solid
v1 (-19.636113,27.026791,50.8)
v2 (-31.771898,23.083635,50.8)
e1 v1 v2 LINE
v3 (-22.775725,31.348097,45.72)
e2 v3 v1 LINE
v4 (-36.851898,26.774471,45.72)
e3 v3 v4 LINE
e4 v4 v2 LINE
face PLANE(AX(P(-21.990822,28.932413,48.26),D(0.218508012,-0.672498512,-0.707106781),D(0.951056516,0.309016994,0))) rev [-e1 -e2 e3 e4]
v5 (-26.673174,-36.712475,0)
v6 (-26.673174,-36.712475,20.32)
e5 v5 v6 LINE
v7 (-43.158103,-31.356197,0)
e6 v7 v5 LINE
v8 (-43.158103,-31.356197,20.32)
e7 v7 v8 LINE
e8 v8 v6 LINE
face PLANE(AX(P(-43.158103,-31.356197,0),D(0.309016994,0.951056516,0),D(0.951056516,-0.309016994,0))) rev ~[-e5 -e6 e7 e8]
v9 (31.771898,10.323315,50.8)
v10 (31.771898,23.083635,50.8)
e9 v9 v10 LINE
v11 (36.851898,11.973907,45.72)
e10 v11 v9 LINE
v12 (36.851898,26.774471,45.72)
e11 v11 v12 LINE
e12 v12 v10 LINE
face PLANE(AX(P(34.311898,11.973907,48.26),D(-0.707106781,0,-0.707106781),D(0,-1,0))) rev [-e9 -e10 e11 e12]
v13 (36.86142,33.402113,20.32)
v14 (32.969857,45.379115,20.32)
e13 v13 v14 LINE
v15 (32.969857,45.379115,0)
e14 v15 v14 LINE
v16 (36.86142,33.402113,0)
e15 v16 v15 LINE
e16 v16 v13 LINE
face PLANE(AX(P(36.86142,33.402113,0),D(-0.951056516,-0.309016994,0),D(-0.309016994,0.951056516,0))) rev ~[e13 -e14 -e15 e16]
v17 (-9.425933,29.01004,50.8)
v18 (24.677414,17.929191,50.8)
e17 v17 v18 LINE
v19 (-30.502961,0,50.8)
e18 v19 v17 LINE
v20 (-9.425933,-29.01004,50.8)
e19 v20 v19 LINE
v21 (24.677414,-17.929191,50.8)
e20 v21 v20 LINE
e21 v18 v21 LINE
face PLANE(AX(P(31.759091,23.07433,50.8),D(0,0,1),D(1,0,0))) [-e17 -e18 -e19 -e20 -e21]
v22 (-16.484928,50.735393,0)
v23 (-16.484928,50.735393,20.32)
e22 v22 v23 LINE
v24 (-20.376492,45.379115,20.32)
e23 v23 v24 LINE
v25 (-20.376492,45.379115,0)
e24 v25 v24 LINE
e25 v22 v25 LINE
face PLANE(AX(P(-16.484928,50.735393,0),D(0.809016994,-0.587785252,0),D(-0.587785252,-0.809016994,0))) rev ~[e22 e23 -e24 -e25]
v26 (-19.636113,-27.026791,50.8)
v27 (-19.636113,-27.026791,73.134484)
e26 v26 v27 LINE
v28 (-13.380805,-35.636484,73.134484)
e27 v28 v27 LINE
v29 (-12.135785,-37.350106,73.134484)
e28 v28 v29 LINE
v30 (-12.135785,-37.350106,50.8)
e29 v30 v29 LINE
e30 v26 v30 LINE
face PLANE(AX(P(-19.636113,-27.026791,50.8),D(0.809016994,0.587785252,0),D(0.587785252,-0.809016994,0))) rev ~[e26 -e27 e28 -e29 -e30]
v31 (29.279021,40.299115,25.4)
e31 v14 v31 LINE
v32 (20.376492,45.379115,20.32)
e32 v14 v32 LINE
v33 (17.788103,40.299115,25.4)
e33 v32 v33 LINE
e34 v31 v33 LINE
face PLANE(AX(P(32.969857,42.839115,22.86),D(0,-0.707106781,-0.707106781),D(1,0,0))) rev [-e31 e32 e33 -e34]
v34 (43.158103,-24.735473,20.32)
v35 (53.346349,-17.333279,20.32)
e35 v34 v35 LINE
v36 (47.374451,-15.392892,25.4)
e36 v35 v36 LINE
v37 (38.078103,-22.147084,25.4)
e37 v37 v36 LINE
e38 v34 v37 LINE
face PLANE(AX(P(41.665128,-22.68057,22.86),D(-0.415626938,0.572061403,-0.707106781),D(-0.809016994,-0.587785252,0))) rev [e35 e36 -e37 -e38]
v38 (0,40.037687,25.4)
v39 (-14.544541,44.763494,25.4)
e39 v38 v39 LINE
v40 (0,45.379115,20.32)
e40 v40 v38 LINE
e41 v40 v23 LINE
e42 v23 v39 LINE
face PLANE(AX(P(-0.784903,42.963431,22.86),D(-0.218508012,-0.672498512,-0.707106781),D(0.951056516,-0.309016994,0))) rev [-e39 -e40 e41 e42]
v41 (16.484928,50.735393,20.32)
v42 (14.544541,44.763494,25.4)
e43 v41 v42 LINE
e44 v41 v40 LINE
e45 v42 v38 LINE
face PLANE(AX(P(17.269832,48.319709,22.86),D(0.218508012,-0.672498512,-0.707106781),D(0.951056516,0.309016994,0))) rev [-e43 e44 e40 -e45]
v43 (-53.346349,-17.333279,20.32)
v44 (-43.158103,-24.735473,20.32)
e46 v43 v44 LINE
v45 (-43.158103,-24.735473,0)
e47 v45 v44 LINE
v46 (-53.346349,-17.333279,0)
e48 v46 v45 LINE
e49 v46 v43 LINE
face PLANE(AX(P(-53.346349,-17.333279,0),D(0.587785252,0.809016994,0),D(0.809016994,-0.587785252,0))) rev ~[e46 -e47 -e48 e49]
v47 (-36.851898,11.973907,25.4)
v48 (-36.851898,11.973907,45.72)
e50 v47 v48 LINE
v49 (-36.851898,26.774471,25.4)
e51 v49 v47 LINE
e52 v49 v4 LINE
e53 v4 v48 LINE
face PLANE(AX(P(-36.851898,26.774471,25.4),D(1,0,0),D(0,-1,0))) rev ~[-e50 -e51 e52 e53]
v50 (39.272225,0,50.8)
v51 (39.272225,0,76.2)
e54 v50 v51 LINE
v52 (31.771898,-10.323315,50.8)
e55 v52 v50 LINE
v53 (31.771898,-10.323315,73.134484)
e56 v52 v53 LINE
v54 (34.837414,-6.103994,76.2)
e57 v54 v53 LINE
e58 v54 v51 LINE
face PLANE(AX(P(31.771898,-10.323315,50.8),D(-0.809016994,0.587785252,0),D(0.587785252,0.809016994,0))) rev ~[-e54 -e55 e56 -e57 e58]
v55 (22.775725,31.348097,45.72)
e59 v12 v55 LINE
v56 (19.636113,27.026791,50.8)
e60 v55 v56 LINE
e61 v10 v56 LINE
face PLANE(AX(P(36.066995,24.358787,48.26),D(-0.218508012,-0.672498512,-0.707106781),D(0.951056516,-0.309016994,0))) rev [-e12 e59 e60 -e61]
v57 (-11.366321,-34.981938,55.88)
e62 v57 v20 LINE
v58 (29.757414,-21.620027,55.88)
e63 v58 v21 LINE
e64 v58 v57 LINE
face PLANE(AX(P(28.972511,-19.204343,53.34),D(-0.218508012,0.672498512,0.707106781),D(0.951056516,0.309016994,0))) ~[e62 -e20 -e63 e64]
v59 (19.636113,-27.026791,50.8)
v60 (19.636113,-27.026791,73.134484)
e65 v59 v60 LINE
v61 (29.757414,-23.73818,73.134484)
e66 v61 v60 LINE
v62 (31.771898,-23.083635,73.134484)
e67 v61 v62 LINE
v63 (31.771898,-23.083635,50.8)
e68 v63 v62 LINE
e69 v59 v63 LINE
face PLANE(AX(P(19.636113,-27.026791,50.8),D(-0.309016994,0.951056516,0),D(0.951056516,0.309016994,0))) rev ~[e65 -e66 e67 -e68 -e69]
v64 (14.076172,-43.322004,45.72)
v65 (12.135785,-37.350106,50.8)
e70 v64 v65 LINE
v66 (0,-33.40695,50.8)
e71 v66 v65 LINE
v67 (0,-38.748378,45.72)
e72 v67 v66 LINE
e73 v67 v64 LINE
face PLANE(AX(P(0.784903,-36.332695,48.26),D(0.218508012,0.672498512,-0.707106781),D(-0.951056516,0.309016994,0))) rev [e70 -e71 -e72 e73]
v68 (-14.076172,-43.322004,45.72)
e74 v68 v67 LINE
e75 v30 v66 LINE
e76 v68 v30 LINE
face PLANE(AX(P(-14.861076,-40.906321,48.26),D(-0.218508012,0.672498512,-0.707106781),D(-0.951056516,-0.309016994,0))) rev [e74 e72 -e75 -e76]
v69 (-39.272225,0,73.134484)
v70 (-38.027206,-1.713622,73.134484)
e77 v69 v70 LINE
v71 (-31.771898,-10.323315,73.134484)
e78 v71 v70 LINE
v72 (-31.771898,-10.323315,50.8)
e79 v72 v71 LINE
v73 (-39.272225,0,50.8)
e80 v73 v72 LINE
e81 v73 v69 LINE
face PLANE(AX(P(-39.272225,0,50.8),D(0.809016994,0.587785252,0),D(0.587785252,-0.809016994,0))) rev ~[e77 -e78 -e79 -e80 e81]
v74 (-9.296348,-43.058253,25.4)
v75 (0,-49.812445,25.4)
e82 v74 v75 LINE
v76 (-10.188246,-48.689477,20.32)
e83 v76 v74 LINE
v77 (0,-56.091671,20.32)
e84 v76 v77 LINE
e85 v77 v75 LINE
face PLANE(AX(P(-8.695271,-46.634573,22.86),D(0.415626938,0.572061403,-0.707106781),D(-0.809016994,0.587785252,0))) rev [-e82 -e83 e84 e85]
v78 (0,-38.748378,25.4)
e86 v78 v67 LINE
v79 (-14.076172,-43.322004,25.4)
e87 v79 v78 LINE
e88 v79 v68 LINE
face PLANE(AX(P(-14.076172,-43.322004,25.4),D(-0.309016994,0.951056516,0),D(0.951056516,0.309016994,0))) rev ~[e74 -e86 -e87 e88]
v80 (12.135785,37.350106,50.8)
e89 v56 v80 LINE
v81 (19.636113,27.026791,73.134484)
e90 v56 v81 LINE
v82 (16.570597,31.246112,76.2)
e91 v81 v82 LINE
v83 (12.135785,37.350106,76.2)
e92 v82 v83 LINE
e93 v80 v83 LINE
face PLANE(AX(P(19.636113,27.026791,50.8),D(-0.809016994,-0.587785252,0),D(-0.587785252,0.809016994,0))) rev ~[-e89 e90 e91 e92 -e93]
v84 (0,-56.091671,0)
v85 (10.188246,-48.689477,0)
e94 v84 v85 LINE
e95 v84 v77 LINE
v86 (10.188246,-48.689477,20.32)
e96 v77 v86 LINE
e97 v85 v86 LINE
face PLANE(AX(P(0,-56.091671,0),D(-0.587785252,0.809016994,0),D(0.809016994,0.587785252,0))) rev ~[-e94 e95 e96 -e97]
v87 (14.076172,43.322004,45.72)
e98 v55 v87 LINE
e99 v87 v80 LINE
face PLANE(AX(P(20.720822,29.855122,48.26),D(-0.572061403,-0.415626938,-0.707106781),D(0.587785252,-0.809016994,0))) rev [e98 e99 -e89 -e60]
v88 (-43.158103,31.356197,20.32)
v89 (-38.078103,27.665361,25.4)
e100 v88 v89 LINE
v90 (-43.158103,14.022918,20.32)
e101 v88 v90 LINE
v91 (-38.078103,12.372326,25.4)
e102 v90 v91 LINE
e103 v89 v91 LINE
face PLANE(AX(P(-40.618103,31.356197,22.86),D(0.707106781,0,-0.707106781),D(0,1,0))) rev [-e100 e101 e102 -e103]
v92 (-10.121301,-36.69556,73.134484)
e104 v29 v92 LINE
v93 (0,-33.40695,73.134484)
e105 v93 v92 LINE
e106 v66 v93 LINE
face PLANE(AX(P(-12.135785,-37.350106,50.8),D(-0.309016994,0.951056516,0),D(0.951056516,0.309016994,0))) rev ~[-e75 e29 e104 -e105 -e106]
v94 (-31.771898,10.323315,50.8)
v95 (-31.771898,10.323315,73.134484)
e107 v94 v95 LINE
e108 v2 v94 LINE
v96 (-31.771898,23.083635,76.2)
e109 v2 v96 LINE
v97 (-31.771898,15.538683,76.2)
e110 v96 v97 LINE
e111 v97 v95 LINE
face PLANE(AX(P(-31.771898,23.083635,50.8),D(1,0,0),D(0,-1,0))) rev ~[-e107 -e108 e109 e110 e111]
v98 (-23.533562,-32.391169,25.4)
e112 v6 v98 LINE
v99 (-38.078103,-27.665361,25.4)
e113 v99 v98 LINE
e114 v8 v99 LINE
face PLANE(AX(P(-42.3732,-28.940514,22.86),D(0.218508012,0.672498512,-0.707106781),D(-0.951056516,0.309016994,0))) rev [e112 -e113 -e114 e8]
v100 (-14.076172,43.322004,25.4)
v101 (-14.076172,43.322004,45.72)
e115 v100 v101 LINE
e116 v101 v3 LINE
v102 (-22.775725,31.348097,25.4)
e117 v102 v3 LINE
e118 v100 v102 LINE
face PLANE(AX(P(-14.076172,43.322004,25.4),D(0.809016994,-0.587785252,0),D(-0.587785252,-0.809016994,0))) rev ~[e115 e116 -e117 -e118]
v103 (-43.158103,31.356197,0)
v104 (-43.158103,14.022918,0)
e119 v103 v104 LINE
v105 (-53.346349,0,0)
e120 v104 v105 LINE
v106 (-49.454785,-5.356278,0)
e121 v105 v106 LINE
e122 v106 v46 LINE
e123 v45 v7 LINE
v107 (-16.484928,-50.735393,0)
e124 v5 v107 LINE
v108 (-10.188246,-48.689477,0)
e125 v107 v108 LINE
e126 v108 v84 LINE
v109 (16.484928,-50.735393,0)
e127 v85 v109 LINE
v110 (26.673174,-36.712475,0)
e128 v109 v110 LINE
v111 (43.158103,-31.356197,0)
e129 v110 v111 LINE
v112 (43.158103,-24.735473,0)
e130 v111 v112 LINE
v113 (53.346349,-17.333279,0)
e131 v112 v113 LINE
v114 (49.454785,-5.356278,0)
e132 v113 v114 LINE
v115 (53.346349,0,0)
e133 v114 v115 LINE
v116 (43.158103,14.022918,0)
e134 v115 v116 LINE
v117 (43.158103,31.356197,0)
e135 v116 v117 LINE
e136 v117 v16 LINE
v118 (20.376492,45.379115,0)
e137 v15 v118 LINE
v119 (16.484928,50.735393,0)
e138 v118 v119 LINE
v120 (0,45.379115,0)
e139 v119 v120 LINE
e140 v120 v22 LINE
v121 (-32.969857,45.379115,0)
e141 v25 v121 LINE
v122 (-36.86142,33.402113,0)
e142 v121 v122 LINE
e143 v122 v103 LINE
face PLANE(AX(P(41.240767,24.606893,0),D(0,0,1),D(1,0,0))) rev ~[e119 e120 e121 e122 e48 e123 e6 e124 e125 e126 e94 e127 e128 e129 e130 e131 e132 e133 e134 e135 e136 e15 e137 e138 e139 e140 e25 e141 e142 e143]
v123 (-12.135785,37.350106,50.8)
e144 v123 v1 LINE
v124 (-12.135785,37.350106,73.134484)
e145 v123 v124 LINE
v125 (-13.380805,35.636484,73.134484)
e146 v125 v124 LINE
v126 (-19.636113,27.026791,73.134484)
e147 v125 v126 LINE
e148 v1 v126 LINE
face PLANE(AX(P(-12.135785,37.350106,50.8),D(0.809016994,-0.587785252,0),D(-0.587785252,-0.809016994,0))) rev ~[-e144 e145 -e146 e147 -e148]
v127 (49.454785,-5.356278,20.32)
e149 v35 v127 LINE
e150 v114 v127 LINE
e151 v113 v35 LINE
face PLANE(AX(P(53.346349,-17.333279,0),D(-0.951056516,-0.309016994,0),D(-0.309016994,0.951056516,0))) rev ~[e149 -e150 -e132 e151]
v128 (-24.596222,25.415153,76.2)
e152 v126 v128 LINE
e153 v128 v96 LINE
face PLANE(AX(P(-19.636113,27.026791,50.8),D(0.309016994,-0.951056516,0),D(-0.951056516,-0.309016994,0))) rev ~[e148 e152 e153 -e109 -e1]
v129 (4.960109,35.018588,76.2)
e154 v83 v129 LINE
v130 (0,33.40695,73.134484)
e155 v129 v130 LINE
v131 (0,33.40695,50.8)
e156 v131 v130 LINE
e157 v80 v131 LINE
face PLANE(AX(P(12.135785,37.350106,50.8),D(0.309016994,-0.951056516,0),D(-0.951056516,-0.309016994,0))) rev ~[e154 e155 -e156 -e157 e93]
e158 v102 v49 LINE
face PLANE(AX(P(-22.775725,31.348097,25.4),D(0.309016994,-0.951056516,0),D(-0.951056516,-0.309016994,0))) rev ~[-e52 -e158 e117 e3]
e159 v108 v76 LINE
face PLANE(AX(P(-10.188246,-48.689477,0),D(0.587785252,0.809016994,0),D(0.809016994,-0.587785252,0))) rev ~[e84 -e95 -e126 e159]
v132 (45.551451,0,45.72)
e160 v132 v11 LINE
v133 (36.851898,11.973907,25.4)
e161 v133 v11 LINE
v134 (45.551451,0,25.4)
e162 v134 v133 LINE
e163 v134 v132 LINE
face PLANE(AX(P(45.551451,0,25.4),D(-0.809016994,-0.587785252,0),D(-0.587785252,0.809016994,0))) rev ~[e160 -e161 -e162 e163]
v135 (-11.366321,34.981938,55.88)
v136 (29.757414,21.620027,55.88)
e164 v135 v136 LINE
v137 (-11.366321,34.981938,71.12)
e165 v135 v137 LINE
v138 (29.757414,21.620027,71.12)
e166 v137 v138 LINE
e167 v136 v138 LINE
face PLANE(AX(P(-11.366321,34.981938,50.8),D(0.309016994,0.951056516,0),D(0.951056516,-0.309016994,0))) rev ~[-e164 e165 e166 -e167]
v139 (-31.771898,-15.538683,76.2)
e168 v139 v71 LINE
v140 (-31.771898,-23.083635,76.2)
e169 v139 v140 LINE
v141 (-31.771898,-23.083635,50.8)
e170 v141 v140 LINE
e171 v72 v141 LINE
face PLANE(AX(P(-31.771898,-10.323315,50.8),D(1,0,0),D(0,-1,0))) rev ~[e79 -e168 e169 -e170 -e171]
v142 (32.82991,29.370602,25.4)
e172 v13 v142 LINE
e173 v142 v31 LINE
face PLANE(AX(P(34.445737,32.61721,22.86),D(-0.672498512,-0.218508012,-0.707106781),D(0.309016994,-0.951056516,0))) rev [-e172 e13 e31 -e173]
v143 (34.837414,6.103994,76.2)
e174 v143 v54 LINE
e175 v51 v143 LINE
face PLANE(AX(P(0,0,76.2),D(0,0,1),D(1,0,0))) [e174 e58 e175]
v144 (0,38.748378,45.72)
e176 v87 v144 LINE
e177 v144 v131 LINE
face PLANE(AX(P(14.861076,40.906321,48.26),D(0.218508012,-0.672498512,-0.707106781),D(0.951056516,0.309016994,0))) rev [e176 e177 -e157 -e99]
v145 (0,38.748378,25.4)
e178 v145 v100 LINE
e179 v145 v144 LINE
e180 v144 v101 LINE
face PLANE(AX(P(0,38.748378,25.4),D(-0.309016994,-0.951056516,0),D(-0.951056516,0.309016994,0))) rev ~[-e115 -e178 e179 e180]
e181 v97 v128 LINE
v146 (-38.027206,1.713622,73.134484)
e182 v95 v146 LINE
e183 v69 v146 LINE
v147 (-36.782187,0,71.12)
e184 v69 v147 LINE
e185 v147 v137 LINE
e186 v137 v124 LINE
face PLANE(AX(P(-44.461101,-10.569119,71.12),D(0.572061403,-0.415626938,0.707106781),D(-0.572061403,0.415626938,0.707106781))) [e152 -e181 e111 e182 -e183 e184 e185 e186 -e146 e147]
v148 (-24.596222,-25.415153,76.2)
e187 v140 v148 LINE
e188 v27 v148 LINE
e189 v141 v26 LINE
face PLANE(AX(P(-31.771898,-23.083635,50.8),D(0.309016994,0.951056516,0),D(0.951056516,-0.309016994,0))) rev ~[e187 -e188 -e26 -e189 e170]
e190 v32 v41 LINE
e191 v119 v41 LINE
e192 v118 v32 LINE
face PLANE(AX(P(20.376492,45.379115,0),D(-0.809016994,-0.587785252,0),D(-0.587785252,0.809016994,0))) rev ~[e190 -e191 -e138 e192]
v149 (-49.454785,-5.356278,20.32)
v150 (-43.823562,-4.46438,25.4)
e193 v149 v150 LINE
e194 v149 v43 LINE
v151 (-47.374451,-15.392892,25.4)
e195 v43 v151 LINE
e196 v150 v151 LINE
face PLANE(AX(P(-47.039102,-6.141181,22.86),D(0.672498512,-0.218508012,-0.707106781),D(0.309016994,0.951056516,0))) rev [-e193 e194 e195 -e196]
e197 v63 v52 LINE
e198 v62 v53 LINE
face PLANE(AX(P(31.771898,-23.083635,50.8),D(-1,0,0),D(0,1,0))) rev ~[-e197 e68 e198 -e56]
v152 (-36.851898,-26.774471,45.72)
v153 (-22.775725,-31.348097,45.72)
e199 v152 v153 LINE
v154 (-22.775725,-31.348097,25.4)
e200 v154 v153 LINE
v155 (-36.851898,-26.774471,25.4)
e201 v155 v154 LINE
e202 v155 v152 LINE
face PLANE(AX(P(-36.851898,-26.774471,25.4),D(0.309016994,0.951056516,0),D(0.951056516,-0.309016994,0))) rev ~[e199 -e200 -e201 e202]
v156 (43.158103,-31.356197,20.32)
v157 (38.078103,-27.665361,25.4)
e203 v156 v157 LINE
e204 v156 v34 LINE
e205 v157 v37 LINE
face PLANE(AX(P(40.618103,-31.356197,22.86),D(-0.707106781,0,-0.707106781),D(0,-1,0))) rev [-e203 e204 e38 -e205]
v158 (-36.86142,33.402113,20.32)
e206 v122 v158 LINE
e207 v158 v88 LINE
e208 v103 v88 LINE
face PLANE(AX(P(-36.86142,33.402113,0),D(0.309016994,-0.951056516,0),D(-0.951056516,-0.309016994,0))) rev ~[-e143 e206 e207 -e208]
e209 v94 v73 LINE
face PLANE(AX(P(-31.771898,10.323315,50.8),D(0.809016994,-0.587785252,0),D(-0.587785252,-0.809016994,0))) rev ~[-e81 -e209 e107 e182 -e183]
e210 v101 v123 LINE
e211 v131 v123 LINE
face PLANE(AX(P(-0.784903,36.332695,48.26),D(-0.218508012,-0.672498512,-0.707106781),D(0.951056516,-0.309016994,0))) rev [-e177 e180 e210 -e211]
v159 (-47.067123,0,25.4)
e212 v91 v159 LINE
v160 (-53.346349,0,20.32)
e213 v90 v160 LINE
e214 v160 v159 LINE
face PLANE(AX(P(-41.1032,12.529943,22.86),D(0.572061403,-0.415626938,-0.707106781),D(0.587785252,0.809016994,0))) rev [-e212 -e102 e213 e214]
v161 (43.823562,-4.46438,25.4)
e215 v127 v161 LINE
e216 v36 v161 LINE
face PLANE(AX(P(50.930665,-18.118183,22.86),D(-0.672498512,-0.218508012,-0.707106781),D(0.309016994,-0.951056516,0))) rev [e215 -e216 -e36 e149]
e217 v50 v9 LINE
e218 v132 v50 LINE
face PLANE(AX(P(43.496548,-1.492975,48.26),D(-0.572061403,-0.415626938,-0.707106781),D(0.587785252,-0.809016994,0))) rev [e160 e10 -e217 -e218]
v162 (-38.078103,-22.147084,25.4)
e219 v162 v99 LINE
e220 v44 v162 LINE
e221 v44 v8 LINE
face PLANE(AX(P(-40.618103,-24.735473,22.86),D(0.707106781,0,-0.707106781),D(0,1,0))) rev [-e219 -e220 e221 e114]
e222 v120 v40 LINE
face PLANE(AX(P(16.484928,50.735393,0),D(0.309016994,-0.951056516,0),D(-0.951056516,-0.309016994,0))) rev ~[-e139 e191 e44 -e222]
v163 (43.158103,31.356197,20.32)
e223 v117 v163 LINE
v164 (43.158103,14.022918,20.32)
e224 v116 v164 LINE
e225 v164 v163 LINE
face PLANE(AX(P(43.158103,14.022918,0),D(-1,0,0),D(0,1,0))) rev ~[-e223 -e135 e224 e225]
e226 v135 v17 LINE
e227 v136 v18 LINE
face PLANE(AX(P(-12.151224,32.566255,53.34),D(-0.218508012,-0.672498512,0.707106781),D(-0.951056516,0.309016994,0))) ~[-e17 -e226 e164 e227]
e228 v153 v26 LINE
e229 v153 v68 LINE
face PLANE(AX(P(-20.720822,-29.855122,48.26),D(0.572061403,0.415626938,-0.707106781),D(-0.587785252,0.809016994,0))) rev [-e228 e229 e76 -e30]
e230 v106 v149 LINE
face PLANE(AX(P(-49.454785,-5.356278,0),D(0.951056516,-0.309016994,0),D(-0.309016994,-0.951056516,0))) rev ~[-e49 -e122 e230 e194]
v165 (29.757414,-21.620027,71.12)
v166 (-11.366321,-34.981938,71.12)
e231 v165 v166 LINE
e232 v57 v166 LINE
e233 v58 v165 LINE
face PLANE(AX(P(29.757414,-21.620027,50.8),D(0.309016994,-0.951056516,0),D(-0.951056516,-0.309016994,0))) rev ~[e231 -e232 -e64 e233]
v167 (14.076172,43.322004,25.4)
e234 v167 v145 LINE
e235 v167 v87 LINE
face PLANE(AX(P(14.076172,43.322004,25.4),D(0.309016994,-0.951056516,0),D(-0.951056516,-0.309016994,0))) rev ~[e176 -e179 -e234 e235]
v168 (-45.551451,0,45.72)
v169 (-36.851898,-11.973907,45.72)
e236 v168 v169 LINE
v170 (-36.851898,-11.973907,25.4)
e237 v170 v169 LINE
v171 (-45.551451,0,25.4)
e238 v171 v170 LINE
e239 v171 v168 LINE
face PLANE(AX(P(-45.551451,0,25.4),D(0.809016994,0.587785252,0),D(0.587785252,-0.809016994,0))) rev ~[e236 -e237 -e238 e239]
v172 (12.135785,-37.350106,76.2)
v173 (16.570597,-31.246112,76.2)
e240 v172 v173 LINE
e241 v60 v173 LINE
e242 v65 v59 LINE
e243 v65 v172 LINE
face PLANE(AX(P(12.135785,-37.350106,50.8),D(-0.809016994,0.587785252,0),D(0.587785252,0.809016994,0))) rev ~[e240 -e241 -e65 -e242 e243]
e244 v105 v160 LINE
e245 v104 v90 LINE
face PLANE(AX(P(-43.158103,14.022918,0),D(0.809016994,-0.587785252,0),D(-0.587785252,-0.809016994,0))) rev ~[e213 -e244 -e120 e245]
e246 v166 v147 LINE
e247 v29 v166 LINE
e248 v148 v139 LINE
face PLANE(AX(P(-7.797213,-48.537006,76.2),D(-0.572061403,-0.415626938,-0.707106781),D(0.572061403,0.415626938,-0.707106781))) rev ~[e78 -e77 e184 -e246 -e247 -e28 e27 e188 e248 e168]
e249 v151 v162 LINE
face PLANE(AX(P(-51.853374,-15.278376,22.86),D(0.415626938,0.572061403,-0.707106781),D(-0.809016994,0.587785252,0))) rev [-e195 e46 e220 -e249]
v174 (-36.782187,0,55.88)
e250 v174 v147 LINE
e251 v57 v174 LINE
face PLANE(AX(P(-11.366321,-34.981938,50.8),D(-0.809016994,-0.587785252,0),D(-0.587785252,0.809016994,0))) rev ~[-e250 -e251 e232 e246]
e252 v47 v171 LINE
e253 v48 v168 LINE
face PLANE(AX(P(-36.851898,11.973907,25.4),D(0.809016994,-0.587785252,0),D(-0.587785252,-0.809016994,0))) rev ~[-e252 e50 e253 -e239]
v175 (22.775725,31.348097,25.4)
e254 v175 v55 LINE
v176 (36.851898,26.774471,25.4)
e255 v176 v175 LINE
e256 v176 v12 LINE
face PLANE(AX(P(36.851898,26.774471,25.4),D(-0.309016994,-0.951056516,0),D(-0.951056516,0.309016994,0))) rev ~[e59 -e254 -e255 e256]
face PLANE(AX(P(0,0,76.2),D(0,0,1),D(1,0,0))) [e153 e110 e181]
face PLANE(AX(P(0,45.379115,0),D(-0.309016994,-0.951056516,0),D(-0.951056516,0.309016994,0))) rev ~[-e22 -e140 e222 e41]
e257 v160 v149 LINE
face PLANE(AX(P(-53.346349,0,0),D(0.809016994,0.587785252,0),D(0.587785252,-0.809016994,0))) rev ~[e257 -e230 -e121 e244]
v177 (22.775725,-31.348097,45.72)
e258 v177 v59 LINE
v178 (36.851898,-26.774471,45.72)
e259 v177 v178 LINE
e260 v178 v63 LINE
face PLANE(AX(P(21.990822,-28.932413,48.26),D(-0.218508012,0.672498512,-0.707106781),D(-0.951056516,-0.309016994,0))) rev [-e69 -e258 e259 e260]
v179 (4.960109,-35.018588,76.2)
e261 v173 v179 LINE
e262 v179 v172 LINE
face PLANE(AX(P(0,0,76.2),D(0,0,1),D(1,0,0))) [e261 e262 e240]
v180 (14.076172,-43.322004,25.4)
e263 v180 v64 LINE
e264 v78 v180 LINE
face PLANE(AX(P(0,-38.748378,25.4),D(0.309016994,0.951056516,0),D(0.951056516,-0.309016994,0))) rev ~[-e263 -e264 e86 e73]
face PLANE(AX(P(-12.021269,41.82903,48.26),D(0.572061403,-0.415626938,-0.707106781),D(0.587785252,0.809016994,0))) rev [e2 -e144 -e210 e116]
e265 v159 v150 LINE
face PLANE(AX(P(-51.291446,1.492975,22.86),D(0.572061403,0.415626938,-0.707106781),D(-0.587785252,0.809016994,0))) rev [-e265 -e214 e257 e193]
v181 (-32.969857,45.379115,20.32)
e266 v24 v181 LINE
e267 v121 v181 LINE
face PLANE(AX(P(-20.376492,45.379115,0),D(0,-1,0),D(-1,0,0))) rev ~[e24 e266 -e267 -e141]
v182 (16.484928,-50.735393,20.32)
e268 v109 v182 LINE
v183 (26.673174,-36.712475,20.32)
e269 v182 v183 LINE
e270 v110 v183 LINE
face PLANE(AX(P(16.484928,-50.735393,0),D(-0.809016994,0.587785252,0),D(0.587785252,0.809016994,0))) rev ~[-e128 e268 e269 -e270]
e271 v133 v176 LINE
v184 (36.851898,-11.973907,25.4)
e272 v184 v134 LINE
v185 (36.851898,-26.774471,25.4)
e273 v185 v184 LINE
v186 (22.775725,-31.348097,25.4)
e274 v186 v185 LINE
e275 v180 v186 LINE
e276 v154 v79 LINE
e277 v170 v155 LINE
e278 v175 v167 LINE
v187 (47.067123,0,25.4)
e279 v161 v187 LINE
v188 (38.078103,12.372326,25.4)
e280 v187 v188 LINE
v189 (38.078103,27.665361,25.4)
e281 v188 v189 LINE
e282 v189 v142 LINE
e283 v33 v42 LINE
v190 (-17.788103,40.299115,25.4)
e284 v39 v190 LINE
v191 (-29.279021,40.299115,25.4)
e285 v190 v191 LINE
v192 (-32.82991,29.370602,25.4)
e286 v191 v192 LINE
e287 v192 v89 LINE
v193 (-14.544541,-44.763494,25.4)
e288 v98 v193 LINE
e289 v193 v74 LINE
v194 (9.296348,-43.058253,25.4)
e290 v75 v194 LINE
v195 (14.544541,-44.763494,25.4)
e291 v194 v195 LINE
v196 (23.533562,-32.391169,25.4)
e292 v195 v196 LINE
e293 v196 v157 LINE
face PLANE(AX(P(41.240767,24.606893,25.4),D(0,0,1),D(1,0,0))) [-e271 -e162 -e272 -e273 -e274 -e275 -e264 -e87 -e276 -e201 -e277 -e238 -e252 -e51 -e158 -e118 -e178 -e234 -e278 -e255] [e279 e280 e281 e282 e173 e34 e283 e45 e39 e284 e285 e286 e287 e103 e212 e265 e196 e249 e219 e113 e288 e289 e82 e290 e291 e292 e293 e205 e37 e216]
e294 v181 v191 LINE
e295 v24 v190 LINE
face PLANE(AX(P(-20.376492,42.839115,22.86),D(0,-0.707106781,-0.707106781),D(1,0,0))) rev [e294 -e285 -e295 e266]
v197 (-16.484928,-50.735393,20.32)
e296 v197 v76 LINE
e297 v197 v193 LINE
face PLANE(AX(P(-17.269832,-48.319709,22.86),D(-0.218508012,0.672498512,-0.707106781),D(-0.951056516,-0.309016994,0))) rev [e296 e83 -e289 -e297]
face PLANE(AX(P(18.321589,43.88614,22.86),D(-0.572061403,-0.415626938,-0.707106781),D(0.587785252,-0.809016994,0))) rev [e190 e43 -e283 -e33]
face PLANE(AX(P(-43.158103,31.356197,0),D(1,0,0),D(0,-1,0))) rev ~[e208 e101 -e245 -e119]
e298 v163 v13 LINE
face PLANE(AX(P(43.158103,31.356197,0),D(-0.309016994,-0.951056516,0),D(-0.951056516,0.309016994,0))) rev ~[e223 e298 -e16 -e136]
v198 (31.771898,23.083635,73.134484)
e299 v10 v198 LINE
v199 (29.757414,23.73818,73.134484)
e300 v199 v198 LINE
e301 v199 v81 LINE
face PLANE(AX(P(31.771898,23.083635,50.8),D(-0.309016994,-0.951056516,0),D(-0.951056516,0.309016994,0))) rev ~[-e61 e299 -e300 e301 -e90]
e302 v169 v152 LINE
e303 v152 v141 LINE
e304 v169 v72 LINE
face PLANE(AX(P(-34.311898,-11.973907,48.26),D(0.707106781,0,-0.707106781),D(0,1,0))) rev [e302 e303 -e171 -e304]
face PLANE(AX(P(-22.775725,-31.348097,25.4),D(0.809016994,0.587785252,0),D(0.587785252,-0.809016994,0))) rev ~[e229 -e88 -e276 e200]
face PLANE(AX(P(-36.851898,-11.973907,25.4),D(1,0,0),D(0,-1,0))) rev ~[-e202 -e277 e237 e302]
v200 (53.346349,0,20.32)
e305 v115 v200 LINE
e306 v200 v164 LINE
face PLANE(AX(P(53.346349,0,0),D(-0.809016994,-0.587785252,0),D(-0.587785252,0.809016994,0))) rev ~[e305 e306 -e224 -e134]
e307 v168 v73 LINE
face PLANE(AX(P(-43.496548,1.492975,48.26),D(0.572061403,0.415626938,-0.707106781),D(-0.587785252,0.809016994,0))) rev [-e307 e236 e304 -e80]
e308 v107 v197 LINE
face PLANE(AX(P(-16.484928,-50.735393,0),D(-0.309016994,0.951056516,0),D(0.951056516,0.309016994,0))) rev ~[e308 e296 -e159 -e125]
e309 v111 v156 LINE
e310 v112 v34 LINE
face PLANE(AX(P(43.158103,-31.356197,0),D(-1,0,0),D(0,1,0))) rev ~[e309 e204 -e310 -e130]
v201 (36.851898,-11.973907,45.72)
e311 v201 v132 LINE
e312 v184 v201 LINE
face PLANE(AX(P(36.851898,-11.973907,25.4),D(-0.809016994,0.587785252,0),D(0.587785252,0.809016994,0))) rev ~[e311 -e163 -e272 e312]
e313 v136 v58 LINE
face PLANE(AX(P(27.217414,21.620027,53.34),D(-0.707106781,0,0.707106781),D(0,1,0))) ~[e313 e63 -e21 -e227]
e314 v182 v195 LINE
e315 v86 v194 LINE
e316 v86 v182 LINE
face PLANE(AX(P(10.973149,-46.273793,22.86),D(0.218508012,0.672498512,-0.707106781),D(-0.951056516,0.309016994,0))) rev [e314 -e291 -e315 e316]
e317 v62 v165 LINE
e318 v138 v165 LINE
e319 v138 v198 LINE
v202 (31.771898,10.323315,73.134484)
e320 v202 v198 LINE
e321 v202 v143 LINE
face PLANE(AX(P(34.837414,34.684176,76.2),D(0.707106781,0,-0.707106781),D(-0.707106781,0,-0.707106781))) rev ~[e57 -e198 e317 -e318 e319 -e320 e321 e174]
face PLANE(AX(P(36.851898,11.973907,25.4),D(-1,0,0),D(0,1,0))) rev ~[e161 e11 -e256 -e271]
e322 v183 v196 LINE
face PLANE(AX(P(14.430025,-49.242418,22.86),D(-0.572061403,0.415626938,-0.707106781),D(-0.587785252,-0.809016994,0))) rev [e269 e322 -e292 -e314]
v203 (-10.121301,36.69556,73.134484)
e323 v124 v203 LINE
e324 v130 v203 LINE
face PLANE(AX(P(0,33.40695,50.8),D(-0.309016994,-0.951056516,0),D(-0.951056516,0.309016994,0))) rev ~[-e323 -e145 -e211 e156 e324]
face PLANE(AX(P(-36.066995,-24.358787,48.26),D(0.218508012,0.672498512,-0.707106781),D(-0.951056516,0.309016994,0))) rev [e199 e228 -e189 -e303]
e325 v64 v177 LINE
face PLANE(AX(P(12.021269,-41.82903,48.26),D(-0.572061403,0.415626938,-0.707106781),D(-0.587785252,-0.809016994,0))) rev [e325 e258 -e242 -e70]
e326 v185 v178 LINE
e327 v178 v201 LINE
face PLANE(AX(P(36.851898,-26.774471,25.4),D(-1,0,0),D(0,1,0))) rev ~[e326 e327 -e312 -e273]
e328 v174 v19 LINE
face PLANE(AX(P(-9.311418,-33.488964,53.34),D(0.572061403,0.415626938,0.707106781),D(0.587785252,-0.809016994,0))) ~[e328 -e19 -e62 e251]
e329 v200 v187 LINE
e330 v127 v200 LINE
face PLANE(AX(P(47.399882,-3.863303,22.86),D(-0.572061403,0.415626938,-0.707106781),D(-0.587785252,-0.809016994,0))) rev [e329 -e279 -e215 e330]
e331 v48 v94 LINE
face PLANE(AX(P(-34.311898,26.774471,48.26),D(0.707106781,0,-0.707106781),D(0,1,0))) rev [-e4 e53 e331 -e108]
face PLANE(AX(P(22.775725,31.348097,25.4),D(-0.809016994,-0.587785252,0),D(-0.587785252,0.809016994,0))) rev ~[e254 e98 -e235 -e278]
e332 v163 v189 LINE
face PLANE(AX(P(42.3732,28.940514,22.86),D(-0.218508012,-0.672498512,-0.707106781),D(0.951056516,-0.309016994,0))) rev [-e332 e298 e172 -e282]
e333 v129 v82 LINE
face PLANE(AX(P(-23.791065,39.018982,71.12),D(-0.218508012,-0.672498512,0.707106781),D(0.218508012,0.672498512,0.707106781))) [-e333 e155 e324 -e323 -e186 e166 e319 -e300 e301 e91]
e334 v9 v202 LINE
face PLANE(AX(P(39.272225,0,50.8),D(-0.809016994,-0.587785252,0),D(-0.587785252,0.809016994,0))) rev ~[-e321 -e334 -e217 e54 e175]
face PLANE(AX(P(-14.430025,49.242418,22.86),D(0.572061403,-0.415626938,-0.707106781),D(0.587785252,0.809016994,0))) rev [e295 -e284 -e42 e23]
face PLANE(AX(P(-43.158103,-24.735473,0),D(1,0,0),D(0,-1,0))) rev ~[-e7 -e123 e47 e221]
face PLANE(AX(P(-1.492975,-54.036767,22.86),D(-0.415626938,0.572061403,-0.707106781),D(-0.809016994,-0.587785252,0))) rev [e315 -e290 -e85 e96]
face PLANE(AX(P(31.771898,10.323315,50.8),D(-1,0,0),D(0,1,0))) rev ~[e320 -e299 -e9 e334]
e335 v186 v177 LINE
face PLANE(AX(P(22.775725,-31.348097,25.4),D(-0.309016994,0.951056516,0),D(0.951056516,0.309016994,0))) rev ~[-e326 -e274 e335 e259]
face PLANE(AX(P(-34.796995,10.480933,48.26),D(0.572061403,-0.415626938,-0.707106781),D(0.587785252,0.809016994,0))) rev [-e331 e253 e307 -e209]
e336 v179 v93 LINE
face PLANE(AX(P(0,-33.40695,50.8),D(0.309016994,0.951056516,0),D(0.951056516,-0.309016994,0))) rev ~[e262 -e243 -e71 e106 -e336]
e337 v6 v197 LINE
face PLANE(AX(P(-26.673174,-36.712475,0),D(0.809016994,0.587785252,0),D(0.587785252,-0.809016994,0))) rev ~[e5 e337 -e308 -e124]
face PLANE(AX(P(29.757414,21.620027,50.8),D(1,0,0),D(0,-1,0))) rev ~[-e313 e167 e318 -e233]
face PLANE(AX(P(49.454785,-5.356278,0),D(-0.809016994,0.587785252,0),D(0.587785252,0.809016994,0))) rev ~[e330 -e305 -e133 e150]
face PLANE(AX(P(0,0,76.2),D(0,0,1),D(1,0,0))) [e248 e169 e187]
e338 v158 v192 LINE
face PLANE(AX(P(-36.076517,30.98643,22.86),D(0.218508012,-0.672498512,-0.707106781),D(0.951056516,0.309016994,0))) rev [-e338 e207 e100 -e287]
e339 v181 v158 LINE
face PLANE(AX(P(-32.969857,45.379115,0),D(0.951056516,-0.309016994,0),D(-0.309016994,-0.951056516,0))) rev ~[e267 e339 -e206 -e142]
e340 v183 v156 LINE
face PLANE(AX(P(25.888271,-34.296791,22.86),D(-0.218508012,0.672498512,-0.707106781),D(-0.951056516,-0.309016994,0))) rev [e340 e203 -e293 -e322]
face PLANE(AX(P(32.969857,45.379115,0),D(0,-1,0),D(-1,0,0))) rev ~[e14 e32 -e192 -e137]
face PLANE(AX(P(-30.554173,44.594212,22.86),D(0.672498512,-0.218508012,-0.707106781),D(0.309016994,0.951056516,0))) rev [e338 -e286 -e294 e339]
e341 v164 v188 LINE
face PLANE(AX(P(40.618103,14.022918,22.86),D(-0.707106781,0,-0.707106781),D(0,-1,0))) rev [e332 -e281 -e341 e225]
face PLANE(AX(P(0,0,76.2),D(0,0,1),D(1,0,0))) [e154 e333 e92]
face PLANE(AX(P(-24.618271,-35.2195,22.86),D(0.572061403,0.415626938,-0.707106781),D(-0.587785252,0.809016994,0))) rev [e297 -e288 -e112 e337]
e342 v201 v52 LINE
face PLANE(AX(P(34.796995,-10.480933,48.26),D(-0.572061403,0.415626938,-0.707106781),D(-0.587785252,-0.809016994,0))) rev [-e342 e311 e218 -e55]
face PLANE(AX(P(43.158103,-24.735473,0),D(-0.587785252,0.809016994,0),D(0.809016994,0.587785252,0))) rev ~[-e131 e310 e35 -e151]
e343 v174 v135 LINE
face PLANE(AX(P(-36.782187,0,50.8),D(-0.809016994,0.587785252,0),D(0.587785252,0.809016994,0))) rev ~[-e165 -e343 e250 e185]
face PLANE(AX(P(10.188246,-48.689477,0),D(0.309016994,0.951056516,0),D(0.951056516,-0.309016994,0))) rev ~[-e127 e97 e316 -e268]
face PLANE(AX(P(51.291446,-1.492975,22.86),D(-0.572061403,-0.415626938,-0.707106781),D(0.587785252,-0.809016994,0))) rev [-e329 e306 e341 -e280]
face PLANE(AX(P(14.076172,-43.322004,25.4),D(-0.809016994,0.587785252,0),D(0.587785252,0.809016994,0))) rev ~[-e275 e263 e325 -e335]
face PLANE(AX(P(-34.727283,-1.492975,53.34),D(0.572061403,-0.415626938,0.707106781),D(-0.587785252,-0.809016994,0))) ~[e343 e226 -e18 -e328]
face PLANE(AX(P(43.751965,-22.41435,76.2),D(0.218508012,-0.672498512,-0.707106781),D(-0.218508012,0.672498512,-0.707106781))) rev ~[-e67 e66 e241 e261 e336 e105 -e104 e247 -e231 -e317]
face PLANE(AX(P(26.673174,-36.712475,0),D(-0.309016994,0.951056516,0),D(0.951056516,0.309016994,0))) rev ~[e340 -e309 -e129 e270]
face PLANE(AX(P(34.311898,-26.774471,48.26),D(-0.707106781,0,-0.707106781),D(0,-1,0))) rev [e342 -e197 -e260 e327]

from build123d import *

# Parameters (mm, degrees)
F1_DEPTH      = 25.4
F2_SIZE       = 5.08
F4_DEPTH      = 25.4
F5_SIZE       = 5.08
F7_DEPTH      = 25.4
F8_SIZE       = 5.08
F9_T4_DEPTH   = 69.3683527658
F9_T10_DEPTH  = 69.3683527658
F9_T16_DEPTH  = 69.3683527658
F9_T22_DEPTH  = 69.3683527658
F9_T28_DEPTH  = 69.3683527658
F9_T35_DEPTH  = 69.3683527658
F9_T41_DEPTH  = 69.3683527658
F9_T50_DEPTH  = 69.3683527658
F9_T56_DEPTH  = 69.3683527658
F9_T65_DEPTH  = 69.3683527658
F9_T71_DEPTH  = 69.3683527658
F9_T80_DEPTH  = 69.3683527658
F9_T86_DEPTH  = 69.3683527658
F9_T95_DEPTH  = 69.3683527658
F9_T101_DEPTH = 69.3683527658


# Not quite as in the source:
# - a fillet or chamfer that OpenCascade refuses, or shapes differently, is made with other operations: its cross-section is extruded or revolved along the edge and cut away or added


with BuildPart() as f1:
    # F0 (on Top) → F1 (new body)
    with BuildSketch(Plane.XY):
        Polygon((43.1581027806, 14.0229176455), (43.1581027806, 31.3561970981), (36.8614204445, 33.40211321), align=None)
        Polygon((49.4547851167, -5.3562779191), (43.1581027806, 14.0229176455), (43.1581027806, -14.0229176455), align=None)
        Polygon((43.1581027806, -14.0229176455), (43.1581027806, 14.0229176455), (26.6731744084, 36.7124750172), (0, 45.3791147436), (-26.6731744084, 36.7124750172), (-43.1581027806, 14.0229176455), (-43.1581027806, -14.0229176455), (-26.6731744084, -36.7124750172), (0, -45.3791147436), (26.6731744084, -36.7124750172), align=None)
        Polygon((26.6731744084, 36.7124750172), (43.1581027806, 14.0229176455), (36.8614204445, 33.40211321), align=None)
        Polygon((53.3463488167, 0), (43.1581027806, 14.0229176455), (49.4547851167, -5.3562779191), align=None)
        Polygon((26.6731744084, 36.7124750172), (36.8614204445, 33.40211321), (32.9698567444, 45.3791147436), (20.3764920723, 45.3791147436), align=None)
        Polygon((49.4547851167, -5.3562779191), (43.1581027806, -14.0229176455), (43.1581027806, -24.7354734837), (53.3463488167, -17.3332794527), align=None)
        Polygon((43.1581027806, -24.7354734837), (43.1581027806, -14.0229176455), (26.6731744084, -36.7124750172), align=None)
        Polygon((0, 45.3791147436), (26.6731744084, 36.7124750172), (20.3764920723, 45.3791147436), align=None)
        Polygon((43.1581027806, -31.3561970981), (43.1581027806, -24.7354734837), (26.6731744084, -36.7124750172), align=None)
        Polygon((10.1882460361, -48.6894765508), (26.6731744084, -36.7124750172), (0, -45.3791147436), align=None)
        Polygon((16.4849283722, -50.7353926627), (26.6731744084, -36.7124750172), (10.1882460361, -48.6894765508), align=None)
        Polygon((-20.3764920723, 45.3791147436), (0, 45.3791147436), (-16.4849283722, 50.7353926627), align=None)
        Polygon((-26.6731744084, 36.7124750172), (0, 45.3791147436), (-20.3764920723, 45.3791147436), align=None)
        Polygon((16.4849283722, 50.7353926627), (0, 45.3791147436), (20.3764920723, 45.3791147436), align=None)
        Polygon((10.1882460361, -48.6894765508), (0, -45.3791147436), (-10.1882460361, -48.6894765508), (0, -56.0916705818), align=None)
        Polygon((-10.1882460361, -48.6894765508), (0, -45.3791147436), (-26.6731744084, -36.7124750172), align=None)
        Polygon((-36.8614204445, 33.40211321), (-26.6731744084, 36.7124750172), (-20.3764920723, 45.3791147436), (-32.9698567444, 45.3791147436), align=None)
        Polygon((-43.1581027806, 14.0229176455), (-26.6731744084, 36.7124750172), (-36.8614204445, 33.40211321), align=None)
        Polygon((-16.4849283722, -50.7353926627), (-10.1882460361, -48.6894765508), (-26.6731744084, -36.7124750172), align=None)
        Polygon((-43.1581027806, -24.7354734837), (-26.6731744084, -36.7124750172), (-43.1581027806, -14.0229176455), align=None)
        Polygon((-43.1581027806, -31.3561970981), (-26.6731744084, -36.7124750172), (-43.1581027806, -24.7354734837), align=None)
        Polygon((-49.4547851167, -5.3562779191), (-43.1581027806, 14.0229176455), (-53.3463488167, 0), align=None)
        Polygon((-43.1581027806, -14.0229176455), (-43.1581027806, 14.0229176455), (-49.4547851167, -5.3562779191), align=None)
        Polygon((-43.1581027806, 31.3561970981), (-43.1581027806, 14.0229176455), (-36.8614204445, 33.40211321), align=None)
        Polygon((-43.1581027806, -24.7354734837), (-43.1581027806, -14.0229176455), (-49.4547851167, -5.3562779191), (-53.3463488167, -17.3332794527), align=None)
    extrude(amount=F1_DEPTH)

    # F2
    f2_edges = [f1.edges().sort_by_distance(p)[0] for p in [
        (43.158103, 22.689557, 25.4),
        (40.009762, 32.379155, 25.4),
        (34.915639, 39.390614, 25.4),
        (26.673174, 45.379115, 25.4),
        (18.43071, 48.057254, 25.4),
        (8.242464, 48.057254, 25.4),
        (-8.242464, 48.057254, 25.4),
        (-18.43071, 48.057254, 25.4),
        (-26.673174, 45.379115, 25.4),
        (-34.915639, 39.390614, 25.4),
        (-40.009762, 32.379155, 25.4),
        (-43.158103, 22.689557, 25.4),
        (-48.252226, 7.011459, 25.4),
        (-51.400567, -2.678139, 25.4),
        (-51.400567, -11.344779, 25.4),
        (-48.252226, -21.034376, 25.4),
        (-43.158103, -28.045835, 25.4),
        (-34.915639, -34.034336, 25.4),
        (-21.579051, -43.723934, 25.4),
        (-13.336587, -49.712435, 25.4),
        (-5.094123, -52.390574, 25.4),
        (5.094123, -52.390574, 25.4),
        (13.336587, -49.712435, 25.4),
        (21.579051, -43.723934, 25.4),
        (34.915639, -34.034336, 25.4),
        (43.158103, -28.045835, 25.4),
        (48.252226, -21.034376, 25.4),
        (51.400567, -11.344779, 25.4),
        (51.400567, -2.678139, 25.4),
        (48.252226, 7.011459, 25.4),
    ]]
    chamfer(f2_edges, length=F2_SIZE)

    # F3 (on face) → F4 (join)
    with BuildSketch(Plane.XY.offset(25.4)):
        Polygon((36.8518978357, 11.9739074504), (36.8518978357, 26.7744710154), (22.7757254124, 31.3480966833), align=None)
        Polygon((45.5514508248, 0), (36.8518978357, 11.9739074504), (36.8518978357, -11.9739074504), align=None)
        Polygon((36.8518978357, -11.9739074504), (36.8518978357, 11.9739074504), (22.7757254124, 31.3480966833), (0, 38.7483784658), (-22.7757254124, 31.3480966833), (-36.8518978357, 11.9739074504), (-36.8518978357, -11.9739074504), (-22.7757254124, -31.3480966833), (0, -38.7483784658), (22.7757254124, -31.3480966833), align=None)
        Polygon((0, 38.7483784658), (22.7757254124, 31.3480966833), (14.0761724233, 43.3220041337), align=None)
        Polygon((36.8518978357, -26.7744710154), (36.8518978357, -11.9739074504), (22.7757254124, -31.3480966833), align=None)
        Polygon((-22.7757254124, 31.3480966833), (0, 38.7483784658), (-14.0761724233, 43.3220041337), align=None)
        Polygon((14.0761724233, -43.3220041337), (22.7757254124, -31.3480966833), (0, -38.7483784658), align=None)
        Polygon((-36.8518978357, 11.9739074504), (-22.7757254124, 31.3480966833), (-36.8518978357, 26.7744710154), align=None)
        Polygon((-14.0761724233, -43.3220041337), (0, -38.7483784658), (-22.7757254124, -31.3480966833), align=None)
        Polygon((-36.8518978357, -11.9739074504), (-36.8518978357, 11.9739074504), (-45.5514508248, 0), align=None)
        Polygon((-36.8518978357, -26.7744710154), (-22.7757254124, -31.3480966833), (-36.8518978357, -11.9739074504), align=None)
    extrude(amount=F4_DEPTH)

    # F5
    f5_edges = [f1.edges().sort_by_distance(p)[0] for p in [
        (36.851898, 19.374189, 50.8),
        (29.813812, 29.061284, 50.8),
        (18.425949, 37.33505, 50.8),
        (7.038086, 41.035191, 50.8),
        (-7.038086, 41.035191, 50.8),
        (-18.425949, 37.33505, 50.8),
        (-29.813812, 29.061284, 50.8),
        (-36.851898, 19.374189, 50.8),
        (-41.201674, 5.986954, 50.8),
        (-41.201674, -5.986954, 50.8),
        (-36.851898, -19.374189, 50.8),
        (-29.813812, -29.061284, 50.8),
        (-18.425949, -37.33505, 50.8),
        (-7.038086, -41.035191, 50.8),
        (7.038086, -41.035191, 50.8),
        (18.425949, -37.33505, 50.8),
        (29.813812, -29.061284, 50.8),
        (36.851898, -19.374189, 50.8),
        (41.201674, -5.986954, 50.8),
        (41.201674, 5.986954, 50.8),
    ]]
    chamfer(f5_edges, length=F5_SIZE)

    # F6 (on face) → F7 (join)
    with BuildSketch(Plane.XY.offset(50.8)):
        Polygon((39.2722254991, 0), (31.7718978357, 10.3233153935), (31.7718978357, 23.0836349731), (19.6361127496, 27.0267905768), (12.1357850862, 37.3501059704), (0, 33.4069503666), (-12.1357850862, 37.3501059704), (-19.6361127496, 27.0267905768), (-31.7718978357, 23.0836349731), (-31.7718978357, 10.3233153935), (-39.2722254991, 0), (-31.7718978357, -10.3233153935), (-31.7718978357, -23.0836349731), (-19.6361127496, -27.0267905768), (-12.1357850862, -37.3501059704), (0, -33.4069503666), (12.1357850862, -37.3501059704), (19.6361127496, -27.0267905768), (31.7718978357, -23.0836349731), (31.7718978357, -10.3233153935), align=None)
        Polygon((-11.3663207357, 34.9819382066), (29.7574140131, 21.620026804), (29.7574140131, -21.620026804), (-11.3663207357, -34.9819382066), (-36.7821865549, 0), align=None, mode=Mode.SUBTRACT)
    extrude(amount=F7_DEPTH)

    # F8
    f8_edges = [f1.edges().sort_by_distance(p)[0] for p in [
        (9.195547, 28.300983, 50.8),
        (29.757414, 0, 50.8),
        (9.195547, -28.300983, 50.8),
        (-24.074254, -17.490969, 50.8),
        (-24.074254, 17.490969, 50.8),
    ]]
    chamfer(f8_edges, length=F8_SIZE)

    # F9: chamfer of 5.08 on 5 edges, made by hand


with BuildPart() as f9_tool2:
    # F9_s3 → F9_t4 (new body)
    with BuildSketch(Plane(origin=(-20.3868473658, -28.0600881296, 0), x_dir=(0, 0, 1), z_dir=(0.5877852523, 0.8090169944, 0))):
        Polygon((71.12, -29.7574140131), (76.2, -34.8374140131), (76.2, -29.7574140131), align=None)
    extrude(amount=F9_T4_DEPTH)

    split(bisect_by=Plane(origin=(9.1955466387, 28.3009825053, 0), x_dir=(0, 0, 1), z_dir=(-0.3090169944, -0.9510565163, 0)), keep=Keep.TOP)

    split(bisect_by=Plane(origin=(-24.0742536453, -17.4909691033, 0), x_dir=(0, 0, 1), z_dir=(0.8090169944, 0.5877852523, 0)), keep=Keep.TOP)


with BuildPart() as f1_1:
    add(f1.part)

    # F9_t1: cut F9_tool2
    add(f9_tool2.part, mode=Mode.SUBTRACT)


with BuildPart() as f9_tool8:
    # F9_s9 → F9_t10 (new body)
    with BuildSketch(Plane(origin=(-32.9866119613, 10.7179999382, 0), x_dir=(0, 0, 1), z_dir=(0.9510565163, -0.3090169944, 0))):
        Polygon((71.12, -29.7574140131), (76.2, -34.8374140131), (76.2, -29.7574140131), align=None)
    extrude(amount=F9_T10_DEPTH)

    split(bisect_by=Plane(origin=(-24.0742536453, 17.4909691033, 0), x_dir=(0, 0, 1), z_dir=(0.8090169944, -0.5877852523, 0)), keep=Keep.TOP)

    split(bisect_by=Plane.YZ.offset(29.7574140131), keep=Keep.BOTTOM)


with BuildPart() as f1_2:
    add(f1_1.part)

    # F9_t7: cut F9_tool8
    add(f9_tool8.part, mode=Mode.SUBTRACT)


with BuildPart() as f9_tool14:
    # F9_s15 → F9_t16 (new body)
    with BuildSketch(Plane.XZ.offset(-34.6841763829)):
        Polygon((34.8374140131, 76.2), (29.7574140131, 71.12), (29.7574140131, 76.2), align=None)
    extrude(amount=F9_T16_DEPTH)

    split(bisect_by=Plane(origin=(9.1955466387, 28.3009825053, 0), x_dir=(0, 0, 1), z_dir=(-0.3090169944, -0.9510565163, 0)), keep=Keep.TOP)

    split(bisect_by=Plane(origin=(9.1955466387, -28.3009825053, 0), x_dir=(0, 0, 1), z_dir=(-0.3090169944, 0.9510565163, 0)), keep=Keep.TOP)


with BuildPart() as f1_3:
    add(f1_2.part)

    # F9_t13: cut F9_tool14
    add(f9_tool14.part, mode=Mode.SUBTRACT)


with BuildPart() as f9_tool20:
    # F9_s21 → F9_t22 (new body)
    with BuildSketch(Plane(origin=(32.9866119613, 10.7179999382, 0), x_dir=(0, 0, 1), z_dir=(-0.9510565163, -0.3090169944, 0))):
        Polygon((76.2, -34.8374140131), (71.12, -29.7574140131), (76.2, -29.7574140131), align=None)
    extrude(amount=F9_T22_DEPTH)

    split(bisect_by=Plane.YZ.offset(29.7574140131), keep=Keep.BOTTOM)

    split(bisect_by=Plane(origin=(-24.0742536453, -17.4909691033, 0), x_dir=(0, 0, 1), z_dir=(0.8090169944, 0.5877852523, 0)), keep=Keep.TOP)


with BuildPart() as f1_4:
    add(f1_3.part)

    # F9_t19: cut F9_tool20
    add(f9_tool20.part, mode=Mode.SUBTRACT)


with BuildPart() as f9_tool26:
    # F9_s27 → F9_t28 (new body)
    with BuildSketch(Plane(origin=(20.3868473658, -28.0600881296, 0), x_dir=(0, 0, 1), z_dir=(-0.5877852523, 0.8090169944, 0))):
        Polygon((76.2, -34.8374140131), (71.12, -29.7574140131), (76.2, -29.7574140131), align=None)
    extrude(amount=F9_T28_DEPTH)

    split(bisect_by=Plane(origin=(-24.0742536453, 17.4909691033, 0), x_dir=(0, 0, 1), z_dir=(0.8090169944, -0.5877852523, 0)), keep=Keep.TOP)

    split(bisect_by=Plane(origin=(9.1955466387, -28.3009825053, 0), x_dir=(0, 0, 1), z_dir=(-0.3090169944, 0.9510565163, 0)), keep=Keep.TOP)


with BuildPart() as f1_5:
    add(f1_4.part)

    # F9_t25: cut F9_tool26
    add(f9_tool26.part, mode=Mode.SUBTRACT)


with BuildPart() as f9_tool33:
    # F9_s34 → F9_t35 (new body)
    with BuildSketch(Plane(origin=(-20.3868473658, -28.0600881296, 0), x_dir=(0, 0, 1), z_dir=(0.5877852523, 0.8090169944, 0))):
        Polygon((71.12, -29.7574140131), (76.2, -34.8374140131), (76.2, -29.7574140131), align=None)
    extrude(amount=F9_T35_DEPTH)

    split(bisect_by=Plane(origin=(-24.0742536453, -17.4909691033, 0), x_dir=(0, 0, 1), z_dir=(-0.8090169944, -0.5877852523, 0)), keep=Keep.TOP)

    split(bisect_by=Plane(origin=(-25.7040052927, 18.6750529852, 0), x_dir=(0, 0, 1), z_dir=(0.8090169944, -0.5877852523, 0)), keep=Keep.TOP)

    split(bisect_by=Plane(origin=(-25.7040052927, -18.6750529852, 0), x_dir=(0, 0, 1), z_dir=(0.8090169944, 0.5877852523, 0)), keep=Keep.TOP)


with BuildPart() as f9_tool39:
    # F9_s40 → F9_t41 (new body)
    with BuildSketch(Plane(origin=(20.3868473658, -28.0600881296, 0), x_dir=(0, 0, 1), z_dir=(-0.5877852523, 0.8090169944, 0))):
        Polygon((76.2, -34.8374140131), (71.12, -29.7574140131), (76.2, -29.7574140131), align=None)
    extrude(amount=F9_T41_DEPTH)

    split(bisect_by=Plane(origin=(-24.0742536453, 17.4909691033, 0), x_dir=(0, 0, 1), z_dir=(-0.8090169944, 0.5877852523, 0)), keep=Keep.TOP)

    split(bisect_by=Plane(origin=(-25.7040052927, 18.6750529852, 0), x_dir=(0, 0, 1), z_dir=(0.8090169944, -0.5877852523, 0)), keep=Keep.TOP)

    split(bisect_by=Plane(origin=(-25.7040052927, -18.6750529852, 0), x_dir=(0, 0, 1), z_dir=(0.8090169944, 0.5877852523, 0)), keep=Keep.TOP)


with BuildPart() as f9_tool33_1:
    add(f9_tool33.part)

    # F9_t45: intersect F9_tool39
    add(f9_tool39.part, mode=Mode.INTERSECT)


with BuildPart() as f1_6:
    add(f1_5.part)

    # F9_t31: cut F9_tool33
    add(f9_tool33_1.part, mode=Mode.SUBTRACT)


with BuildPart() as f9_tool48:
    # F9_s49 → F9_t50 (new body)
    with BuildSketch(Plane(origin=(-32.9866119613, 10.7179999382, 0), x_dir=(0, 0, 1), z_dir=(0.9510565163, -0.3090169944, 0))):
        Polygon((71.12, -29.7574140131), (76.2, -34.8374140131), (76.2, -29.7574140131), align=None)
    extrude(amount=F9_T50_DEPTH)

    split(bisect_by=Plane(origin=(-24.0742536453, 17.4909691033, 0), x_dir=(0, 0, 1), z_dir=(-0.8090169944, 0.5877852523, 0)), keep=Keep.TOP)

    split(bisect_by=Plane(origin=(9.8180563748, 30.2168704717, 0), x_dir=(0, 0, 1), z_dir=(-0.3090169944, -0.9510565163, 0)), keep=Keep.TOP)

    split(bisect_by=Plane(origin=(-25.7040052927, 18.6750529852, 0), x_dir=(0, 0, 1), z_dir=(0.8090169944, -0.5877852523, 0)), keep=Keep.TOP)


with BuildPart() as f9_tool54:
    # F9_s55 → F9_t56 (new body)
    with BuildSketch(Plane(origin=(-20.3868473658, -28.0600881296, 0), x_dir=(0, 0, 1), z_dir=(0.5877852523, 0.8090169944, 0))):
        Polygon((71.12, -29.7574140131), (76.2, -34.8374140131), (76.2, -29.7574140131), align=None)
    extrude(amount=F9_T56_DEPTH)

    split(bisect_by=Plane(origin=(9.1955466387, 28.3009825053, 0), x_dir=(0, 0, 1), z_dir=(0.3090169944, 0.9510565163, 0)), keep=Keep.TOP)

    split(bisect_by=Plane(origin=(9.8180563748, 30.2168704717, 0), x_dir=(0, 0, 1), z_dir=(-0.3090169944, -0.9510565163, 0)), keep=Keep.TOP)

    split(bisect_by=Plane(origin=(-25.7040052927, 18.6750529852, 0), x_dir=(0, 0, 1), z_dir=(0.8090169944, -0.5877852523, 0)), keep=Keep.TOP)


with BuildPart() as f9_tool48_1:
    add(f9_tool48.part)

    # F9_t60: intersect F9_tool54
    add(f9_tool54.part, mode=Mode.INTERSECT)


with BuildPart() as f1_7:
    add(f1_6.part)

    # F9_t46: cut F9_tool48
    add(f9_tool48_1.part, mode=Mode.SUBTRACT)


with BuildPart() as f9_tool63:
    # F9_s64 → F9_t65 (new body)
    with BuildSketch(Plane(origin=(-32.9866119613, 10.7179999382, 0), x_dir=(0, 0, 1), z_dir=(0.9510565163, -0.3090169944, 0))):
        Polygon((71.12, -29.7574140131), (76.2, -34.8374140131), (76.2, -29.7574140131), align=None)
    extrude(amount=F9_T65_DEPTH)

    split(bisect_by=Plane.YZ.offset(29.7574140131), keep=Keep.TOP)

    split(bisect_by=Plane.YZ.offset(31.7718978357), keep=Keep.BOTTOM)

    split(bisect_by=Plane(origin=(9.8180563748, 30.2168704717, 0), x_dir=(0, 0, 1), z_dir=(-0.3090169944, -0.9510565163, 0)), keep=Keep.TOP)


with BuildPart() as f9_tool69:
    # F9_s70 → F9_t71 (new body)
    with BuildSketch(Plane.XZ.offset(-34.6841763829)):
        Polygon((34.8374140131, 76.2), (29.7574140131, 71.12), (29.7574140131, 76.2), align=None)
    extrude(amount=F9_T71_DEPTH)

    split(bisect_by=Plane(origin=(9.1955466387, 28.3009825053, 0), x_dir=(0, 0, 1), z_dir=(0.3090169944, 0.9510565163, 0)), keep=Keep.TOP)

    split(bisect_by=Plane.YZ.offset(31.7718978357), keep=Keep.BOTTOM)

    split(bisect_by=Plane(origin=(9.8180563748, 30.2168704717, 0), x_dir=(0, 0, 1), z_dir=(-0.3090169944, -0.9510565163, 0)), keep=Keep.TOP)


with BuildPart() as f9_tool63_1:
    add(f9_tool63.part)

    # F9_t75: intersect F9_tool69
    add(f9_tool69.part, mode=Mode.INTERSECT)


with BuildPart() as f1_8:
    add(f1_7.part)

    # F9_t61: cut F9_tool63
    add(f9_tool63_1.part, mode=Mode.SUBTRACT)


with BuildPart() as f9_tool78:
    # F9_s79 → F9_t80 (new body)
    with BuildSketch(Plane.XZ.offset(-34.6841763829)):
        Polygon((34.8374140131, 76.2), (29.7574140131, 71.12), (29.7574140131, 76.2), align=None)
    extrude(amount=F9_T80_DEPTH)

    split(bisect_by=Plane(origin=(9.8180563748, -30.2168704717, 0), x_dir=(0, 0, 1), z_dir=(-0.3090169944, 0.9510565163, 0)), keep=Keep.TOP)

    split(bisect_by=Plane.YZ.offset(31.7718978357), keep=Keep.BOTTOM)

    split(bisect_by=Plane(origin=(9.1955466387, -28.3009825053, 0), x_dir=(0, 0, 1), z_dir=(0.3090169944, -0.9510565163, 0)), keep=Keep.TOP)


with BuildPart() as f9_tool84:
    # F9_s85 → F9_t86 (new body)
    with BuildSketch(Plane(origin=(32.9866119613, 10.7179999382, 0), x_dir=(0, 0, 1), z_dir=(-0.9510565163, -0.3090169944, 0))):
        Polygon((76.2, -34.8374140131), (71.12, -29.7574140131), (76.2, -29.7574140131), align=None)
    extrude(amount=F9_T86_DEPTH)

    split(bisect_by=Plane.YZ.offset(29.7574140131), keep=Keep.TOP)

    split(bisect_by=Plane(origin=(9.8180563748, -30.2168704717, 0), x_dir=(0, 0, 1), z_dir=(-0.3090169944, 0.9510565163, 0)), keep=Keep.TOP)

    split(bisect_by=Plane.YZ.offset(31.7718978357), keep=Keep.BOTTOM)


with BuildPart() as f9_tool78_1:
    add(f9_tool78.part)

    # F9_t90: intersect F9_tool84
    add(f9_tool84.part, mode=Mode.INTERSECT)


with BuildPart() as f1_9:
    add(f1_8.part)

    # F9_t76: cut F9_tool78
    add(f9_tool78_1.part, mode=Mode.SUBTRACT)


with BuildPart() as f9_tool93:
    # F9_s94 → F9_t95 (new body)
    with BuildSketch(Plane(origin=(32.9866119613, 10.7179999382, 0), x_dir=(0, 0, 1), z_dir=(-0.9510565163, -0.3090169944, 0))):
        Polygon((76.2, -34.8374140131), (71.12, -29.7574140131), (76.2, -29.7574140131), align=None)
    extrude(amount=F9_T95_DEPTH)

    split(bisect_by=Plane(origin=(-24.0742536453, -17.4909691033, 0), x_dir=(0, 0, 1), z_dir=(-0.8090169944, -0.5877852523, 0)), keep=Keep.TOP)

    split(bisect_by=Plane(origin=(9.8180563748, -30.2168704717, 0), x_dir=(0, 0, 1), z_dir=(-0.3090169944, 0.9510565163, 0)), keep=Keep.TOP)

    split(bisect_by=Plane(origin=(-25.7040052927, -18.6750529852, 0), x_dir=(0, 0, 1), z_dir=(0.8090169944, 0.5877852523, 0)), keep=Keep.TOP)


with BuildPart() as f9_tool99:
    # F9_s100 → F9_t101 (new body)
    with BuildSketch(Plane(origin=(20.3868473658, -28.0600881296, 0), x_dir=(0, 0, 1), z_dir=(-0.5877852523, 0.8090169944, 0))):
        Polygon((76.2, -34.8374140131), (71.12, -29.7574140131), (76.2, -29.7574140131), align=None)
    extrude(amount=F9_T101_DEPTH)

    split(bisect_by=Plane(origin=(-25.7040052927, -18.6750529852, 0), x_dir=(0, 0, 1), z_dir=(0.8090169944, 0.5877852523, 0)), keep=Keep.TOP)

    split(bisect_by=Plane(origin=(9.8180563748, -30.2168704717, 0), x_dir=(0, 0, 1), z_dir=(-0.3090169944, 0.9510565163, 0)), keep=Keep.TOP)

    split(bisect_by=Plane(origin=(9.1955466387, -28.3009825053, 0), x_dir=(0, 0, 1), z_dir=(0.3090169944, -0.9510565163, 0)), keep=Keep.TOP)


with BuildPart() as f9_tool93_1:
    add(f9_tool93.part)

    # F9_t105: intersect F9_tool99
    add(f9_tool99.part, mode=Mode.INTERSECT)


with BuildPart() as f1_10:
    add(f1_9.part)

    # F9_t91: cut F9_tool93
    add(f9_tool93_1.part, mode=Mode.SUBTRACT)


solid = f1_10.part
